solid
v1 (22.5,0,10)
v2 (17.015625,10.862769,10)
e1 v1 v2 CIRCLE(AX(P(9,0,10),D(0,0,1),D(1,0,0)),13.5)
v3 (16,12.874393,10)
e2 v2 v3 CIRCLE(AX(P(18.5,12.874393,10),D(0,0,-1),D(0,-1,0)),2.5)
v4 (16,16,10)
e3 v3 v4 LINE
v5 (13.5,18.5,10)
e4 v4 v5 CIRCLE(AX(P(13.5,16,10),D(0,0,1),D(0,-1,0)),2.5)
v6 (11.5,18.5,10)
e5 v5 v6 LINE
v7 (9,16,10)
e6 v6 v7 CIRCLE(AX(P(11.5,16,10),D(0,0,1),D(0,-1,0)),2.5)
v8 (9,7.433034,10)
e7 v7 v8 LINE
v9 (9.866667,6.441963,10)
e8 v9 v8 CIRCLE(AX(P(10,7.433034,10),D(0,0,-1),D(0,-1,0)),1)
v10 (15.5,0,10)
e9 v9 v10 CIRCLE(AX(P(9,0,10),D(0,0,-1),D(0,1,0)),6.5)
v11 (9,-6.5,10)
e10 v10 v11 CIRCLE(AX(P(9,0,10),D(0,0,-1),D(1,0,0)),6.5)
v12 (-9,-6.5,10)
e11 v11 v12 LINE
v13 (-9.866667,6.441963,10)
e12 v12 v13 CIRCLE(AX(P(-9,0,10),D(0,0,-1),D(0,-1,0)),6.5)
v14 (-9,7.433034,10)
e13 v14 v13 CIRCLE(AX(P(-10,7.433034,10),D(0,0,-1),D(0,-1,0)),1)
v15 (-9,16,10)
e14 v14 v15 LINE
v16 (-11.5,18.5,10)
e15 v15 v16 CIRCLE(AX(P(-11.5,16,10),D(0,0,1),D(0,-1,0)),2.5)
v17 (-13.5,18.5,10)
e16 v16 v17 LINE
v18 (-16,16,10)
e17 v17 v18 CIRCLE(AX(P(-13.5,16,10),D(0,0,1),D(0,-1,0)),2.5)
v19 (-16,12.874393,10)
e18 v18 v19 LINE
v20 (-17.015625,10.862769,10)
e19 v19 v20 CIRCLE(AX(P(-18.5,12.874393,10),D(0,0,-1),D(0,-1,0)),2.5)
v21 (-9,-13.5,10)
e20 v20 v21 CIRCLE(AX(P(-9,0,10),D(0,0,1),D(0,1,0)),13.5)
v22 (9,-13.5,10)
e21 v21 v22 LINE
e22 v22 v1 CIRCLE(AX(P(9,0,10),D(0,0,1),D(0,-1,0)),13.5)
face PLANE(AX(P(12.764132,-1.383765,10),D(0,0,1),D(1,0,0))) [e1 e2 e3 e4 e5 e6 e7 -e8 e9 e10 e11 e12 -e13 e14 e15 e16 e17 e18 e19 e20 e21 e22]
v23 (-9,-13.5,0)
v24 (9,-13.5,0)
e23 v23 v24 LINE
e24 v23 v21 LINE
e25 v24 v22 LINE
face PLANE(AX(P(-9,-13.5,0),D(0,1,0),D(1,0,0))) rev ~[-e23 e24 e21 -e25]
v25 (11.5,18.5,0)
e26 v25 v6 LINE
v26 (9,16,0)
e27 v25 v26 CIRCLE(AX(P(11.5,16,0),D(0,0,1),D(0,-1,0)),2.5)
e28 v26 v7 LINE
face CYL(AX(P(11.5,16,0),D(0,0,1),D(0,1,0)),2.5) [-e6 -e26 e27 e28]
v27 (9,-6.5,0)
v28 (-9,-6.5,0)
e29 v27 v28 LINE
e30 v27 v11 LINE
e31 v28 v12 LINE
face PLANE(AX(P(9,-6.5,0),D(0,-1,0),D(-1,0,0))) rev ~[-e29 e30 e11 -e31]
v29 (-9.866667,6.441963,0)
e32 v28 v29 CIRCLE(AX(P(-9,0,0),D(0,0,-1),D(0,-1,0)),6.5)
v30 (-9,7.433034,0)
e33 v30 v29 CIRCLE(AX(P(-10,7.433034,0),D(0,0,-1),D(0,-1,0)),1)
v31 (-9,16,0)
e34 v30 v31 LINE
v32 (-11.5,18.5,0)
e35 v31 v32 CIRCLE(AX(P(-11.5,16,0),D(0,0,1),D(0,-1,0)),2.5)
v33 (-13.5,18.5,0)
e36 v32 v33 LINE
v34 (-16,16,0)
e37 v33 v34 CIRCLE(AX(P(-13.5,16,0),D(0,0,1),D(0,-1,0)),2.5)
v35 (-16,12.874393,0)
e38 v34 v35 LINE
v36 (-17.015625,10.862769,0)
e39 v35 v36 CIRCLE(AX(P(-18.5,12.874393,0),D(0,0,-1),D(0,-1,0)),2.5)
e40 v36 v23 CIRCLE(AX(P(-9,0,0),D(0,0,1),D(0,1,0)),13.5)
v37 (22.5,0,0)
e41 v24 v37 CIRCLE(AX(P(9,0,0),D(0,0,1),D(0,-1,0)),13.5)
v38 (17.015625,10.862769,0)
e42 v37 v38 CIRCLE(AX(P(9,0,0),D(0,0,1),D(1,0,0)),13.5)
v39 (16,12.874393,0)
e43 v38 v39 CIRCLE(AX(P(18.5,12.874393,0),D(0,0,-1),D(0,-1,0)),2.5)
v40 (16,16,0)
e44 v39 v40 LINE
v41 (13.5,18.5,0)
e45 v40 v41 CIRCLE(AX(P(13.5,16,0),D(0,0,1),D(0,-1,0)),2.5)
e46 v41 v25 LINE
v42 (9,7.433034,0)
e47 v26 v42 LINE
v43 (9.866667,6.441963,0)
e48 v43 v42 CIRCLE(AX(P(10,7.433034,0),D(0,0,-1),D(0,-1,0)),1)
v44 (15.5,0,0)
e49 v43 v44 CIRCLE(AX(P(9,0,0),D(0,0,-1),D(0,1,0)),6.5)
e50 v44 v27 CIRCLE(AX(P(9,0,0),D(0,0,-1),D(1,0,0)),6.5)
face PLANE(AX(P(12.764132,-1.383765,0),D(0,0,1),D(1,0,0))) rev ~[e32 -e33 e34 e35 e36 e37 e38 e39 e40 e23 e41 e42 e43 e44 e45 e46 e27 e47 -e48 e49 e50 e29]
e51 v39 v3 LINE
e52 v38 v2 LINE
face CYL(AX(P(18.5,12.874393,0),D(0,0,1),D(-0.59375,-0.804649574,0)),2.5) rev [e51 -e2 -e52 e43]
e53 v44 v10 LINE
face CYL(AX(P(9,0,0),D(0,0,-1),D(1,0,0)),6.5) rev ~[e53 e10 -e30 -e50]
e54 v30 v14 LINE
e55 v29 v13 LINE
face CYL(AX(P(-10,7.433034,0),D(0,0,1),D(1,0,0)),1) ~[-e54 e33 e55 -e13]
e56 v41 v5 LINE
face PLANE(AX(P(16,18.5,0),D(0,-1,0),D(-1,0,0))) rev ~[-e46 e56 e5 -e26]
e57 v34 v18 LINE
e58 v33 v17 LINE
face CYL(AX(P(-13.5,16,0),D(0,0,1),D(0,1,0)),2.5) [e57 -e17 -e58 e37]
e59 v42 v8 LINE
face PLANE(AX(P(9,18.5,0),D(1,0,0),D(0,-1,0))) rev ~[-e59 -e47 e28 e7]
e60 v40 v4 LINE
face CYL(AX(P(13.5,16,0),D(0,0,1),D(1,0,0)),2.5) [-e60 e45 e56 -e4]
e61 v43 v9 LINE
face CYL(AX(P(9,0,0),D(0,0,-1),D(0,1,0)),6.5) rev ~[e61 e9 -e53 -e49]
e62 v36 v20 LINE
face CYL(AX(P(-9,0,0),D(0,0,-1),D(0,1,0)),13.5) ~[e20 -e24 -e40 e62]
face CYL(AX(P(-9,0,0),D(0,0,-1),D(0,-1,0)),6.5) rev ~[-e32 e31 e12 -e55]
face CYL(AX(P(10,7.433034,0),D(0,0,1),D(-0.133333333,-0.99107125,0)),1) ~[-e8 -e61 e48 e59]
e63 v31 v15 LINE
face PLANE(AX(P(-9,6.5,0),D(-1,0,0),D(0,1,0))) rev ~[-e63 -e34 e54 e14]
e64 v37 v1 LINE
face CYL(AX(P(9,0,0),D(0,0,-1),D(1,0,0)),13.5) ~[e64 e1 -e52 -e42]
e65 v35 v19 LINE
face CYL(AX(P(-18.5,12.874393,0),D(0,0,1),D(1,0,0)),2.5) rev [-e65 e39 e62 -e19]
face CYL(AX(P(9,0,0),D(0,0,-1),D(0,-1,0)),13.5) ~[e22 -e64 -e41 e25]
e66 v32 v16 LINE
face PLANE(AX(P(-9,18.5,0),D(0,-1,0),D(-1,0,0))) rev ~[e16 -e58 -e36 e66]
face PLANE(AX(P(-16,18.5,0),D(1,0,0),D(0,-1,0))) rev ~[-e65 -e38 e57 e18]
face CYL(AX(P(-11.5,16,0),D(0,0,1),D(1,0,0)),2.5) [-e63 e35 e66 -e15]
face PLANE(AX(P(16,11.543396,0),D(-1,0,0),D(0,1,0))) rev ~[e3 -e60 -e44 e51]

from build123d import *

# Parameters (mm, degrees)
F1_DEPTH = 10
F2_R     = 2.5
F3_R     = 1


with BuildPart() as f1:
    # F0 (on Top) → F1 (new body)
    with BuildSketch(Plane.XY):
        with BuildLine():
            ThreePointArc((15.5, 0), (13.5961940777, -4.5961940777), (9, -6.5))
            Line((9, -6.5), (2.8321595662, -6.5))
            ThreePointArc((2.8321595662, -6.5), (1.5672713544, -8.4013556122), (0, -10.0623058987))
            ThreePointArc((0, -10.0623058987), (4.1829017881, -12.611326846), (9, -13.5))
            ThreePointArc((9, -13.5), (18.545941546, -9.545941546), (22.5, 0))
            ThreePointArc((22.5, 0), (20.763290356, 6.6238206497), (16, 11.5433963806))
            ThreePointArc((16, 11.5433963806), (12.634153881, 13.0016508786), (9, 13.5))
            Line((9, 13.5), (9, 6.5))
            ThreePointArc((9, 6.5), (13.5961940777, 4.5961940777), (15.5, 0))
        make_face()
        with BuildLine():
            ThreePointArc((0, -10.0623058987), (1.5672713544, -8.4013556122), (2.8321595662, -6.5))
            Line((2.8321595662, -6.5), (-2.8321595662, -6.5))
            ThreePointArc((-2.8321595662, -6.5), (-1.5672713544, -8.4013556122), (0, -10.0623058987))
        make_face()
        with BuildLine():
            Line((9, 18.5), (9, 13.5))
            ThreePointArc((9, 13.5), (12.634153881, 13.0016508786), (16, 11.5433963806))
            Line((16, 11.5433963806), (16, 18.5))
            Line((16, 18.5), (9, 18.5))
        make_face()
        with BuildLine():
            ThreePointArc((0, -10.0623058987), (-1.5672713544, -8.4013556122), (-2.8321595662, -6.5))
            Line((-2.8321595662, -6.5), (-9, -6.5))
            ThreePointArc((-9, -6.5), (-15.5, 0), (-9, 6.5))
            Line((-9, 6.5), (-9, 13.5))
            ThreePointArc((-9, 13.5), (-12.634153881, 13.0016508786), (-16, 11.5433963806))
            ThreePointArc((-16, 11.5433963806), (-22.0016508786, -3.634153881), (-9, -13.5))
            ThreePointArc((-9, -13.5), (-4.1829017881, -12.611326846), (0, -10.0623058987))
        make_face()
        with BuildLine():
            ThreePointArc((9, -13.5), (4.1829017881, -12.611326846), (0, -10.0623058987))
            ThreePointArc((0, -10.0623058987), (-4.1829017881, -12.611326846), (-9, -13.5))
            Line((-9, -13.5), (9, -13.5))
        make_face()
        with BuildLine():
            ThreePointArc((-16, 11.5433963806), (-12.634153881, 13.0016508786), (-9, 13.5))
            Line((-9, 13.5), (-9, 18.5))
            Line((-9, 18.5), (-16, 18.5))
            Line((-16, 18.5), (-16, 11.5433963806))
        make_face()
    extrude(amount=F1_DEPTH)

    # F2
    f2_edges = [f1.edges().sort_by_distance(p)[0] for p in [
        (16, 18.5, 5),
        (9, 18.5, 5),
        (-9, 18.5, 5),
        (-16, 18.5, 5),
        (16, 11.543396, 5),
        (-16, 11.543396, 5),
    ]]
    fillet(f2_edges, radius=F2_R)

    # F3
    f3_edges = [f1.edges().sort_by_distance(p)[0] for p in [
        (-9, -6.5, 5),
        (9, -6.5, 5),
        (-9, 6.5, 5),
        (9, 6.5, 5),
    ]]
    fillet(f3_edges, radius=F3_R)


solid = f1.part
